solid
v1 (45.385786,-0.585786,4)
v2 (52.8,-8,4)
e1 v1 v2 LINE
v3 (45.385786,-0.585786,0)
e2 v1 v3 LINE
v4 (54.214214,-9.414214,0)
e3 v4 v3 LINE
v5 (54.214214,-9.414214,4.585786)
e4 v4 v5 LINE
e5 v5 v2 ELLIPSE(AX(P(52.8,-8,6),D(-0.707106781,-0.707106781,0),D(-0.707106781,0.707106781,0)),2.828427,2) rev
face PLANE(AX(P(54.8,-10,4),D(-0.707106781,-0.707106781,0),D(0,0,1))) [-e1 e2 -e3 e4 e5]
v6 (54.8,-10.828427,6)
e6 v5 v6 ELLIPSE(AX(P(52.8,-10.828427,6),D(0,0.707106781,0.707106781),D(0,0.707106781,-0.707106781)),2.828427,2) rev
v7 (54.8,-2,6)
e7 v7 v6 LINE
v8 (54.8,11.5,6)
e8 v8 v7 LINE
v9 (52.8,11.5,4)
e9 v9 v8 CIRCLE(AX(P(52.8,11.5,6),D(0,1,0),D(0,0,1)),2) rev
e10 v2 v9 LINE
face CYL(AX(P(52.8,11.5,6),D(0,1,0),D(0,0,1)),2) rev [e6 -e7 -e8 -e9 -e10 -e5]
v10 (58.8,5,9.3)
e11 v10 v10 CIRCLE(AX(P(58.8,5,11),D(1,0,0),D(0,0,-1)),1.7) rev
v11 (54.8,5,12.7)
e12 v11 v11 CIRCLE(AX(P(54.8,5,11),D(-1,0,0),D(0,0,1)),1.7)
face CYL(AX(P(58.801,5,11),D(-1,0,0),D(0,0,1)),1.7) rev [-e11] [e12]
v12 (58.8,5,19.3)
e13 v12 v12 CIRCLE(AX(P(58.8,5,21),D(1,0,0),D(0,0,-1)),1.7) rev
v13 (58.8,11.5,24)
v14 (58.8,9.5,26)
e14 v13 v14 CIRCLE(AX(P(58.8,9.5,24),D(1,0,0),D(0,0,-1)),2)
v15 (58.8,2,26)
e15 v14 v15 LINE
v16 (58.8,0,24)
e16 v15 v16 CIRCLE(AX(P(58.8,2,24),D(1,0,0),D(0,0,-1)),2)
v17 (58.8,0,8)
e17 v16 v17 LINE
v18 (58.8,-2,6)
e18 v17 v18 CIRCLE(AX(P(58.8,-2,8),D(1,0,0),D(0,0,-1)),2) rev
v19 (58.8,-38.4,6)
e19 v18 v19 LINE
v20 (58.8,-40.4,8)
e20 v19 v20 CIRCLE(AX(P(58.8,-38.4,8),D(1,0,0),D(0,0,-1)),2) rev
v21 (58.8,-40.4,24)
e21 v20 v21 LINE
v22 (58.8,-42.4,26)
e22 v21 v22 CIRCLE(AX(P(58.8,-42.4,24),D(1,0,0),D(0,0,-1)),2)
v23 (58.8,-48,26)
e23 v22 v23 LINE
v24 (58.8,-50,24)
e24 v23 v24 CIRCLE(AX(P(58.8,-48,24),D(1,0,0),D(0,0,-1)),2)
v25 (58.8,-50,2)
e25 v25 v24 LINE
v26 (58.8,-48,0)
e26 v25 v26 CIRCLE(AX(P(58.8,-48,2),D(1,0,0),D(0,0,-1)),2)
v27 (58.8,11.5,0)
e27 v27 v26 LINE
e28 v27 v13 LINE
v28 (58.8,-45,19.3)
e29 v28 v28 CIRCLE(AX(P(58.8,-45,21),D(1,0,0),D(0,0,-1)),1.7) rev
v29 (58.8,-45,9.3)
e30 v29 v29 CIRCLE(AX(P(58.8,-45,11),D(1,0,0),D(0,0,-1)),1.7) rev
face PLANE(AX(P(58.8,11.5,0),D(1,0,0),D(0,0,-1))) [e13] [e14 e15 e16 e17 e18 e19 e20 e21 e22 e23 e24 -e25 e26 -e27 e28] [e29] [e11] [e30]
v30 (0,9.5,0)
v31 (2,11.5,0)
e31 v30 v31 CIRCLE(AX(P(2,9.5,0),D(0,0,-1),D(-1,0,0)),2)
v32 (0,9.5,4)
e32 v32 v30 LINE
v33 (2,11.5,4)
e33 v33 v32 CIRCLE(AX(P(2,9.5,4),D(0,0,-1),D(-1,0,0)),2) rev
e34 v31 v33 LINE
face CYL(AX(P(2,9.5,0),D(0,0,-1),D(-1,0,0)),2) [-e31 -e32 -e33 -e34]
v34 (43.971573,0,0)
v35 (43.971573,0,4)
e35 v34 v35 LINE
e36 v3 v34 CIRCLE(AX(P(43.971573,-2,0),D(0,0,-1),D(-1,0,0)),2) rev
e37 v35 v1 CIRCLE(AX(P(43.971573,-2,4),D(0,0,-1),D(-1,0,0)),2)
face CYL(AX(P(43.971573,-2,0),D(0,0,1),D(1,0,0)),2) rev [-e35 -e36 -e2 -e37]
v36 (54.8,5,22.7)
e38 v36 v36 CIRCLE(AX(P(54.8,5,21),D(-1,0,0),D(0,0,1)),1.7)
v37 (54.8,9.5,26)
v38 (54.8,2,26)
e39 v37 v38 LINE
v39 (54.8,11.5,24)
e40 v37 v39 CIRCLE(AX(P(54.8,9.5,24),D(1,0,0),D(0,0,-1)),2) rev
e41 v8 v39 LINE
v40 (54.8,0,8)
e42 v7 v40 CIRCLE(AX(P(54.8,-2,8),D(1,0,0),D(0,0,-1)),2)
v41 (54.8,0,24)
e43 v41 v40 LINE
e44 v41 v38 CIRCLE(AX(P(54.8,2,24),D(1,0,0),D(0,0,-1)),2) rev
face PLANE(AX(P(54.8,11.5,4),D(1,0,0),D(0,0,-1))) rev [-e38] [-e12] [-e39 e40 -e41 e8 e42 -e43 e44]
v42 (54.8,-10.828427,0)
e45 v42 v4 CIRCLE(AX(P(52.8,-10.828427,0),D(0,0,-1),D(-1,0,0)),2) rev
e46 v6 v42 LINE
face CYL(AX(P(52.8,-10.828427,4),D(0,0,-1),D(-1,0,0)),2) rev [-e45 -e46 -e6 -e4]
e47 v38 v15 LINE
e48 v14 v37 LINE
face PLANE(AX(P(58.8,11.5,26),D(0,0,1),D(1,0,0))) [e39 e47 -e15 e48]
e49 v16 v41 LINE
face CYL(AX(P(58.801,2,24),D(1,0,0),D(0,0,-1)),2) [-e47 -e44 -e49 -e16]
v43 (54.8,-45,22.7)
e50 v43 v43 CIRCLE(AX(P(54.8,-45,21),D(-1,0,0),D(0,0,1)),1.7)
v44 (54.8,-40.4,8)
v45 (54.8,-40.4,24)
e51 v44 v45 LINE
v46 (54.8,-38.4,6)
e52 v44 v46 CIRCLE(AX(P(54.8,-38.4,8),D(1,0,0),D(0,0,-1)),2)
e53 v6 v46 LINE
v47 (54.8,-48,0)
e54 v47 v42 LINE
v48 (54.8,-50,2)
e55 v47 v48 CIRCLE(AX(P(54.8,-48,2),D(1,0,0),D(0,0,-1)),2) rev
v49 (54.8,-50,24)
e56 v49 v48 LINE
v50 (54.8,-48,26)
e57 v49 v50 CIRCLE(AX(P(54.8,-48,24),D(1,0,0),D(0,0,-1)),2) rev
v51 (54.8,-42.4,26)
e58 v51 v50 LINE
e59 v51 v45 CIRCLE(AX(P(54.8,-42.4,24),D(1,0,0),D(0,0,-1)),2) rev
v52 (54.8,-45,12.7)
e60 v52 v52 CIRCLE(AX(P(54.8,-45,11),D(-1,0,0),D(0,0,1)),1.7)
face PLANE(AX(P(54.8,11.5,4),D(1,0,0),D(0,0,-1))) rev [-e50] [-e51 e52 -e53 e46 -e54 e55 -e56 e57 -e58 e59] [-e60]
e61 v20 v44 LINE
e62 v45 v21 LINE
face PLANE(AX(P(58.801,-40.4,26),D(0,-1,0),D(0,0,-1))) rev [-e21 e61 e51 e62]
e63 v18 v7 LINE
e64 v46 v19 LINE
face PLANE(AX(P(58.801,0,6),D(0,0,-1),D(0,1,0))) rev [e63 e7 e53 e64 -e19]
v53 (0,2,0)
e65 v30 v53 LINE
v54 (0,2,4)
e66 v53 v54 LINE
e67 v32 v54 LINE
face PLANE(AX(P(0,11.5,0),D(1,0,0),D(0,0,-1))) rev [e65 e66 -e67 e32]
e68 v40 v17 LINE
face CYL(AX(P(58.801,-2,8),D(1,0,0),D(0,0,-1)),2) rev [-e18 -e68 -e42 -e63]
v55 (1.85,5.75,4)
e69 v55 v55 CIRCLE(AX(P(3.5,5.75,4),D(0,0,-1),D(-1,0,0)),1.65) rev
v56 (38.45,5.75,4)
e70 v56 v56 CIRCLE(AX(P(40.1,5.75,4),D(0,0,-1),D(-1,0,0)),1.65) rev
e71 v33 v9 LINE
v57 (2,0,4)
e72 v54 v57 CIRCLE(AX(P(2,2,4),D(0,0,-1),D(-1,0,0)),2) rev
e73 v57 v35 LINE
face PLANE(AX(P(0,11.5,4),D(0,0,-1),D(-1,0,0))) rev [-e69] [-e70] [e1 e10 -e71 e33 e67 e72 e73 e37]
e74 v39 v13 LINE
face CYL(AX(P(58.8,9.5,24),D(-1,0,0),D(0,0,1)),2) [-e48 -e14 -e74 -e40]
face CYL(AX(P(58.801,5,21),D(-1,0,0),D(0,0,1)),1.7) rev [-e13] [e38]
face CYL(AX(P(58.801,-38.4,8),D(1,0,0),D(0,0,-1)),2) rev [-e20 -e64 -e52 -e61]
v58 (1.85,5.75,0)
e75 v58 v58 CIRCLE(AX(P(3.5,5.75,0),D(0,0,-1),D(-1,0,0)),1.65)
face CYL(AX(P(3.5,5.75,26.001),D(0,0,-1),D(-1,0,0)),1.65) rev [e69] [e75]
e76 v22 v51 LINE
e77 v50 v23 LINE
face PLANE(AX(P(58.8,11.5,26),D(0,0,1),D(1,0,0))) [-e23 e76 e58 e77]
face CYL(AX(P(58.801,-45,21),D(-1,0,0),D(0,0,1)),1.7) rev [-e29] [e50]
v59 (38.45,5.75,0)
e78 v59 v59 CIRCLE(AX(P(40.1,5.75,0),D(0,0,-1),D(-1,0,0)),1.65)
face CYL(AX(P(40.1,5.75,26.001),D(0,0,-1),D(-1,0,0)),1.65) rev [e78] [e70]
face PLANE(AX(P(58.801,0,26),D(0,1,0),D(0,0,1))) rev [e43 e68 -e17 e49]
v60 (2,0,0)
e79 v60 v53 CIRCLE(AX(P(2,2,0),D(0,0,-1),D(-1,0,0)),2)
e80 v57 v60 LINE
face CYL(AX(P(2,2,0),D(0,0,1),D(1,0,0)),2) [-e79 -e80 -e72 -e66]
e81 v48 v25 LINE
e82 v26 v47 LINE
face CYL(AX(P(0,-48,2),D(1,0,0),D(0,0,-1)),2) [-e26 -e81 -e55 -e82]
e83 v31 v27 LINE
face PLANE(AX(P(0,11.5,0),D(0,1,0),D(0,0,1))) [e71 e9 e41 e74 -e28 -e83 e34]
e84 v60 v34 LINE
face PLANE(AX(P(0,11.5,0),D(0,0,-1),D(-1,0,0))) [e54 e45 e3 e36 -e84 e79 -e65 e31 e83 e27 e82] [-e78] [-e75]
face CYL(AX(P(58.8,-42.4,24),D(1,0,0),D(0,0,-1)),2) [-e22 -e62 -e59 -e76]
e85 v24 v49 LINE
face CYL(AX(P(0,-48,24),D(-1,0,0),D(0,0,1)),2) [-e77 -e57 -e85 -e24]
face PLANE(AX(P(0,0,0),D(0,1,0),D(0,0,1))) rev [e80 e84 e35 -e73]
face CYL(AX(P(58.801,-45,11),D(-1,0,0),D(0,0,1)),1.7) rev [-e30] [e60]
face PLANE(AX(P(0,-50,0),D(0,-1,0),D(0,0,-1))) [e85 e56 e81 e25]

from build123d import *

# Parameters (mm, degrees)
SKETCH1_W           = 58.8
SKETCH1_H           = 4
SKETCH1_W_2         = 4
SKETCH1_H_2         = 22
BOSS_EXTRUDE1_DEPTH = 11.5
CUT_EXTRUDE1_REACH  = 67.312
SKETCH2_R           = 1.65
SKETCH3_W           = 4
SKETCH3_H           = 26
BOSS_EXTRUDE2_DEPTH = 50
CUT_EXTRUDE2_REACH  = 80.607
SKETCH4_R           = 1.7
SKETCH4_W           = 20
SKETCH4_H           = 40.4
CHAMFER1_SIZE       = 10
FILLET1_R           = 2
FILLET2_R           = 2
FILLET3_R           = 2
FILLET4_R           = 2


with BuildPart() as part:
    # Sketch1 → Boss-Extrude1 (new body)
    with BuildSketch(Plane(origin=(0, 0, 0), x_dir=(1, 0, 0), z_dir=(0, 1, 0))):
        with Locations((29.4, -2)):
            Rectangle(SKETCH1_W, SKETCH1_H)
        with Locations((56.8, -15)):
            Rectangle(SKETCH1_W_2, SKETCH1_H_2)
    extrude(amount=BOSS_EXTRUDE1_DEPTH)

    # Sketch2 → Cut-Extrude1 (cut, up to next)
    with BuildSketch(Plane(origin=(0, 0, 0), x_dir=(-1, 0, 0), z_dir=(0, 0, -1)), mode=Mode.PRIVATE) as cut_extrude1_sk1:
        with Locations((-3.5, 5.75)):
            Circle(SKETCH2_R)
    cut_extrude1_tool1 = extrude(cut_extrude1_sk1.sketch, amount=-CUT_EXTRUDE1_REACH, mode=Mode.PRIVATE) & part.part
    # Sketch2 → Cut-Extrude1 (cut, up to next)
    with BuildSketch(Plane(origin=(0, 0, 0), x_dir=(-1, 0, 0), z_dir=(0, 0, -1)), mode=Mode.PRIVATE) as cut_extrude1_sk2:
        with Locations((-40.1, 5.75)):
            Circle(SKETCH2_R)
    cut_extrude1_tool2 = extrude(cut_extrude1_sk2.sketch, amount=-CUT_EXTRUDE1_REACH, mode=Mode.PRIVATE) & part.part
    add(cut_extrude1_tool1.solids().sort_by_distance((3.5, 5.75, 0))[0], mode=Mode.SUBTRACT)
    add(cut_extrude1_tool2.solids().sort_by_distance((40.1, 5.75, 0))[0], mode=Mode.SUBTRACT)

    # Sketch3 → Boss-Extrude2 (add)
    with BuildSketch(Plane.XZ):
        with Locations((56.8, 13)):
            Rectangle(SKETCH3_W, SKETCH3_H)
    extrude(amount=BOSS_EXTRUDE2_DEPTH)

    # Sketch4 → Cut-Extrude2 (cut, up to next)
    with BuildSketch(Plane.ZY.offset(-54.8), mode=Mode.PRIVATE) as cut_extrude2_sk1:
        with Locations((11, 5)):
            Circle(SKETCH4_R)
    cut_extrude2_tool1 = extrude(cut_extrude2_sk1.sketch, amount=-CUT_EXTRUDE2_REACH, mode=Mode.PRIVATE) & part.part
    # Sketch4 → Cut-Extrude2 (cut, up to next)
    with BuildSketch(Plane.ZY.offset(-54.8), mode=Mode.PRIVATE) as cut_extrude2_sk2:
        with Locations((21, 5)):
            Circle(SKETCH4_R)
    cut_extrude2_tool2 = extrude(cut_extrude2_sk2.sketch, amount=-CUT_EXTRUDE2_REACH, mode=Mode.PRIVATE) & part.part
    # Sketch4 → Cut-Extrude2 (cut, up to next)
    with BuildSketch(Plane.ZY.offset(-54.8), mode=Mode.PRIVATE) as cut_extrude2_sk3:
        with Locations((21, -45)):
            Circle(SKETCH4_R)
    cut_extrude2_tool3 = extrude(cut_extrude2_sk3.sketch, amount=-CUT_EXTRUDE2_REACH, mode=Mode.PRIVATE) & part.part
    # Sketch4 → Cut-Extrude2 (cut, up to next)
    with BuildSketch(Plane.ZY.offset(-54.8), mode=Mode.PRIVATE) as cut_extrude2_sk4:
        with Locations((11, -45)):
            Circle(SKETCH4_R)
    cut_extrude2_tool4 = extrude(cut_extrude2_sk4.sketch, amount=-CUT_EXTRUDE2_REACH, mode=Mode.PRIVATE) & part.part
    # Sketch4 → Cut-Extrude2 (cut, up to next)
    with BuildSketch(Plane.ZY.offset(-54.8), mode=Mode.PRIVATE) as cut_extrude2_sk5:
        with Locations((16, -20.2)):
            Rectangle(SKETCH4_W, SKETCH4_H)
    cut_extrude2_tool5 = extrude(cut_extrude2_sk5.sketch, amount=-CUT_EXTRUDE2_REACH, mode=Mode.PRIVATE) & part.part
    add(cut_extrude2_tool1.solids().sort_by_distance((54.8, 5, 11))[0], mode=Mode.SUBTRACT)
    add(cut_extrude2_tool2.solids().sort_by_distance((54.8, 5, 21))[0], mode=Mode.SUBTRACT)
    add(cut_extrude2_tool3.solids().sort_by_distance((54.8, -45, 21))[0], mode=Mode.SUBTRACT)
    add(cut_extrude2_tool4.solids().sort_by_distance((54.8, -45, 11))[0], mode=Mode.SUBTRACT)
    add(cut_extrude2_tool5.solids().sort_by_distance((54.8, -20.2, 16))[0], mode=Mode.SUBTRACT)

    # Chamfer1
    chamfer1_edges = [part.edges().sort_by_distance(p)[0] for p in [
        (54.8, 0, 2),
    ]]
    chamfer(chamfer1_edges, length=CHAMFER1_SIZE)

    # Fillet1
    fillet1_edges = [part.edges().sort_by_distance(p)[0] for p in [
        (54.8, 0.75, 4),
    ]]
    fillet(fillet1_edges, radius=FILLET1_R - 0.0001)  # a hair under: the kernel refuses the full size

    # Fillet2
    fillet2_edges = [part.edges().sort_by_distance(p)[0] for p in [
        (56.8, -50, 26),
        (56.8, -40.4, 26),
        (56.8, 0, 26),
        (56.8, 11.5, 26),
        (54.8, -10, 2.99995),
        (44.8, 0, 2),
        (0, 11.5, 2),
        (0, 0, 2),
    ]]
    fillet(fillet2_edges, radius=FILLET2_R)

    # Fillet3
    fillet3_edges = [part.edges().sort_by_distance(p)[0] for p in [
        (56.8, -40.4, 6),
        (56.8, 0, 6),
    ]]
    fillet(fillet3_edges, radius=FILLET3_R)

    # Fillet4
    fillet4_edges = [part.edges().sort_by_distance(p)[0] for p in [
        (56.8, -50, 0),
    ]]
    fillet(fillet4_edges, radius=FILLET4_R)


solid = part.part
